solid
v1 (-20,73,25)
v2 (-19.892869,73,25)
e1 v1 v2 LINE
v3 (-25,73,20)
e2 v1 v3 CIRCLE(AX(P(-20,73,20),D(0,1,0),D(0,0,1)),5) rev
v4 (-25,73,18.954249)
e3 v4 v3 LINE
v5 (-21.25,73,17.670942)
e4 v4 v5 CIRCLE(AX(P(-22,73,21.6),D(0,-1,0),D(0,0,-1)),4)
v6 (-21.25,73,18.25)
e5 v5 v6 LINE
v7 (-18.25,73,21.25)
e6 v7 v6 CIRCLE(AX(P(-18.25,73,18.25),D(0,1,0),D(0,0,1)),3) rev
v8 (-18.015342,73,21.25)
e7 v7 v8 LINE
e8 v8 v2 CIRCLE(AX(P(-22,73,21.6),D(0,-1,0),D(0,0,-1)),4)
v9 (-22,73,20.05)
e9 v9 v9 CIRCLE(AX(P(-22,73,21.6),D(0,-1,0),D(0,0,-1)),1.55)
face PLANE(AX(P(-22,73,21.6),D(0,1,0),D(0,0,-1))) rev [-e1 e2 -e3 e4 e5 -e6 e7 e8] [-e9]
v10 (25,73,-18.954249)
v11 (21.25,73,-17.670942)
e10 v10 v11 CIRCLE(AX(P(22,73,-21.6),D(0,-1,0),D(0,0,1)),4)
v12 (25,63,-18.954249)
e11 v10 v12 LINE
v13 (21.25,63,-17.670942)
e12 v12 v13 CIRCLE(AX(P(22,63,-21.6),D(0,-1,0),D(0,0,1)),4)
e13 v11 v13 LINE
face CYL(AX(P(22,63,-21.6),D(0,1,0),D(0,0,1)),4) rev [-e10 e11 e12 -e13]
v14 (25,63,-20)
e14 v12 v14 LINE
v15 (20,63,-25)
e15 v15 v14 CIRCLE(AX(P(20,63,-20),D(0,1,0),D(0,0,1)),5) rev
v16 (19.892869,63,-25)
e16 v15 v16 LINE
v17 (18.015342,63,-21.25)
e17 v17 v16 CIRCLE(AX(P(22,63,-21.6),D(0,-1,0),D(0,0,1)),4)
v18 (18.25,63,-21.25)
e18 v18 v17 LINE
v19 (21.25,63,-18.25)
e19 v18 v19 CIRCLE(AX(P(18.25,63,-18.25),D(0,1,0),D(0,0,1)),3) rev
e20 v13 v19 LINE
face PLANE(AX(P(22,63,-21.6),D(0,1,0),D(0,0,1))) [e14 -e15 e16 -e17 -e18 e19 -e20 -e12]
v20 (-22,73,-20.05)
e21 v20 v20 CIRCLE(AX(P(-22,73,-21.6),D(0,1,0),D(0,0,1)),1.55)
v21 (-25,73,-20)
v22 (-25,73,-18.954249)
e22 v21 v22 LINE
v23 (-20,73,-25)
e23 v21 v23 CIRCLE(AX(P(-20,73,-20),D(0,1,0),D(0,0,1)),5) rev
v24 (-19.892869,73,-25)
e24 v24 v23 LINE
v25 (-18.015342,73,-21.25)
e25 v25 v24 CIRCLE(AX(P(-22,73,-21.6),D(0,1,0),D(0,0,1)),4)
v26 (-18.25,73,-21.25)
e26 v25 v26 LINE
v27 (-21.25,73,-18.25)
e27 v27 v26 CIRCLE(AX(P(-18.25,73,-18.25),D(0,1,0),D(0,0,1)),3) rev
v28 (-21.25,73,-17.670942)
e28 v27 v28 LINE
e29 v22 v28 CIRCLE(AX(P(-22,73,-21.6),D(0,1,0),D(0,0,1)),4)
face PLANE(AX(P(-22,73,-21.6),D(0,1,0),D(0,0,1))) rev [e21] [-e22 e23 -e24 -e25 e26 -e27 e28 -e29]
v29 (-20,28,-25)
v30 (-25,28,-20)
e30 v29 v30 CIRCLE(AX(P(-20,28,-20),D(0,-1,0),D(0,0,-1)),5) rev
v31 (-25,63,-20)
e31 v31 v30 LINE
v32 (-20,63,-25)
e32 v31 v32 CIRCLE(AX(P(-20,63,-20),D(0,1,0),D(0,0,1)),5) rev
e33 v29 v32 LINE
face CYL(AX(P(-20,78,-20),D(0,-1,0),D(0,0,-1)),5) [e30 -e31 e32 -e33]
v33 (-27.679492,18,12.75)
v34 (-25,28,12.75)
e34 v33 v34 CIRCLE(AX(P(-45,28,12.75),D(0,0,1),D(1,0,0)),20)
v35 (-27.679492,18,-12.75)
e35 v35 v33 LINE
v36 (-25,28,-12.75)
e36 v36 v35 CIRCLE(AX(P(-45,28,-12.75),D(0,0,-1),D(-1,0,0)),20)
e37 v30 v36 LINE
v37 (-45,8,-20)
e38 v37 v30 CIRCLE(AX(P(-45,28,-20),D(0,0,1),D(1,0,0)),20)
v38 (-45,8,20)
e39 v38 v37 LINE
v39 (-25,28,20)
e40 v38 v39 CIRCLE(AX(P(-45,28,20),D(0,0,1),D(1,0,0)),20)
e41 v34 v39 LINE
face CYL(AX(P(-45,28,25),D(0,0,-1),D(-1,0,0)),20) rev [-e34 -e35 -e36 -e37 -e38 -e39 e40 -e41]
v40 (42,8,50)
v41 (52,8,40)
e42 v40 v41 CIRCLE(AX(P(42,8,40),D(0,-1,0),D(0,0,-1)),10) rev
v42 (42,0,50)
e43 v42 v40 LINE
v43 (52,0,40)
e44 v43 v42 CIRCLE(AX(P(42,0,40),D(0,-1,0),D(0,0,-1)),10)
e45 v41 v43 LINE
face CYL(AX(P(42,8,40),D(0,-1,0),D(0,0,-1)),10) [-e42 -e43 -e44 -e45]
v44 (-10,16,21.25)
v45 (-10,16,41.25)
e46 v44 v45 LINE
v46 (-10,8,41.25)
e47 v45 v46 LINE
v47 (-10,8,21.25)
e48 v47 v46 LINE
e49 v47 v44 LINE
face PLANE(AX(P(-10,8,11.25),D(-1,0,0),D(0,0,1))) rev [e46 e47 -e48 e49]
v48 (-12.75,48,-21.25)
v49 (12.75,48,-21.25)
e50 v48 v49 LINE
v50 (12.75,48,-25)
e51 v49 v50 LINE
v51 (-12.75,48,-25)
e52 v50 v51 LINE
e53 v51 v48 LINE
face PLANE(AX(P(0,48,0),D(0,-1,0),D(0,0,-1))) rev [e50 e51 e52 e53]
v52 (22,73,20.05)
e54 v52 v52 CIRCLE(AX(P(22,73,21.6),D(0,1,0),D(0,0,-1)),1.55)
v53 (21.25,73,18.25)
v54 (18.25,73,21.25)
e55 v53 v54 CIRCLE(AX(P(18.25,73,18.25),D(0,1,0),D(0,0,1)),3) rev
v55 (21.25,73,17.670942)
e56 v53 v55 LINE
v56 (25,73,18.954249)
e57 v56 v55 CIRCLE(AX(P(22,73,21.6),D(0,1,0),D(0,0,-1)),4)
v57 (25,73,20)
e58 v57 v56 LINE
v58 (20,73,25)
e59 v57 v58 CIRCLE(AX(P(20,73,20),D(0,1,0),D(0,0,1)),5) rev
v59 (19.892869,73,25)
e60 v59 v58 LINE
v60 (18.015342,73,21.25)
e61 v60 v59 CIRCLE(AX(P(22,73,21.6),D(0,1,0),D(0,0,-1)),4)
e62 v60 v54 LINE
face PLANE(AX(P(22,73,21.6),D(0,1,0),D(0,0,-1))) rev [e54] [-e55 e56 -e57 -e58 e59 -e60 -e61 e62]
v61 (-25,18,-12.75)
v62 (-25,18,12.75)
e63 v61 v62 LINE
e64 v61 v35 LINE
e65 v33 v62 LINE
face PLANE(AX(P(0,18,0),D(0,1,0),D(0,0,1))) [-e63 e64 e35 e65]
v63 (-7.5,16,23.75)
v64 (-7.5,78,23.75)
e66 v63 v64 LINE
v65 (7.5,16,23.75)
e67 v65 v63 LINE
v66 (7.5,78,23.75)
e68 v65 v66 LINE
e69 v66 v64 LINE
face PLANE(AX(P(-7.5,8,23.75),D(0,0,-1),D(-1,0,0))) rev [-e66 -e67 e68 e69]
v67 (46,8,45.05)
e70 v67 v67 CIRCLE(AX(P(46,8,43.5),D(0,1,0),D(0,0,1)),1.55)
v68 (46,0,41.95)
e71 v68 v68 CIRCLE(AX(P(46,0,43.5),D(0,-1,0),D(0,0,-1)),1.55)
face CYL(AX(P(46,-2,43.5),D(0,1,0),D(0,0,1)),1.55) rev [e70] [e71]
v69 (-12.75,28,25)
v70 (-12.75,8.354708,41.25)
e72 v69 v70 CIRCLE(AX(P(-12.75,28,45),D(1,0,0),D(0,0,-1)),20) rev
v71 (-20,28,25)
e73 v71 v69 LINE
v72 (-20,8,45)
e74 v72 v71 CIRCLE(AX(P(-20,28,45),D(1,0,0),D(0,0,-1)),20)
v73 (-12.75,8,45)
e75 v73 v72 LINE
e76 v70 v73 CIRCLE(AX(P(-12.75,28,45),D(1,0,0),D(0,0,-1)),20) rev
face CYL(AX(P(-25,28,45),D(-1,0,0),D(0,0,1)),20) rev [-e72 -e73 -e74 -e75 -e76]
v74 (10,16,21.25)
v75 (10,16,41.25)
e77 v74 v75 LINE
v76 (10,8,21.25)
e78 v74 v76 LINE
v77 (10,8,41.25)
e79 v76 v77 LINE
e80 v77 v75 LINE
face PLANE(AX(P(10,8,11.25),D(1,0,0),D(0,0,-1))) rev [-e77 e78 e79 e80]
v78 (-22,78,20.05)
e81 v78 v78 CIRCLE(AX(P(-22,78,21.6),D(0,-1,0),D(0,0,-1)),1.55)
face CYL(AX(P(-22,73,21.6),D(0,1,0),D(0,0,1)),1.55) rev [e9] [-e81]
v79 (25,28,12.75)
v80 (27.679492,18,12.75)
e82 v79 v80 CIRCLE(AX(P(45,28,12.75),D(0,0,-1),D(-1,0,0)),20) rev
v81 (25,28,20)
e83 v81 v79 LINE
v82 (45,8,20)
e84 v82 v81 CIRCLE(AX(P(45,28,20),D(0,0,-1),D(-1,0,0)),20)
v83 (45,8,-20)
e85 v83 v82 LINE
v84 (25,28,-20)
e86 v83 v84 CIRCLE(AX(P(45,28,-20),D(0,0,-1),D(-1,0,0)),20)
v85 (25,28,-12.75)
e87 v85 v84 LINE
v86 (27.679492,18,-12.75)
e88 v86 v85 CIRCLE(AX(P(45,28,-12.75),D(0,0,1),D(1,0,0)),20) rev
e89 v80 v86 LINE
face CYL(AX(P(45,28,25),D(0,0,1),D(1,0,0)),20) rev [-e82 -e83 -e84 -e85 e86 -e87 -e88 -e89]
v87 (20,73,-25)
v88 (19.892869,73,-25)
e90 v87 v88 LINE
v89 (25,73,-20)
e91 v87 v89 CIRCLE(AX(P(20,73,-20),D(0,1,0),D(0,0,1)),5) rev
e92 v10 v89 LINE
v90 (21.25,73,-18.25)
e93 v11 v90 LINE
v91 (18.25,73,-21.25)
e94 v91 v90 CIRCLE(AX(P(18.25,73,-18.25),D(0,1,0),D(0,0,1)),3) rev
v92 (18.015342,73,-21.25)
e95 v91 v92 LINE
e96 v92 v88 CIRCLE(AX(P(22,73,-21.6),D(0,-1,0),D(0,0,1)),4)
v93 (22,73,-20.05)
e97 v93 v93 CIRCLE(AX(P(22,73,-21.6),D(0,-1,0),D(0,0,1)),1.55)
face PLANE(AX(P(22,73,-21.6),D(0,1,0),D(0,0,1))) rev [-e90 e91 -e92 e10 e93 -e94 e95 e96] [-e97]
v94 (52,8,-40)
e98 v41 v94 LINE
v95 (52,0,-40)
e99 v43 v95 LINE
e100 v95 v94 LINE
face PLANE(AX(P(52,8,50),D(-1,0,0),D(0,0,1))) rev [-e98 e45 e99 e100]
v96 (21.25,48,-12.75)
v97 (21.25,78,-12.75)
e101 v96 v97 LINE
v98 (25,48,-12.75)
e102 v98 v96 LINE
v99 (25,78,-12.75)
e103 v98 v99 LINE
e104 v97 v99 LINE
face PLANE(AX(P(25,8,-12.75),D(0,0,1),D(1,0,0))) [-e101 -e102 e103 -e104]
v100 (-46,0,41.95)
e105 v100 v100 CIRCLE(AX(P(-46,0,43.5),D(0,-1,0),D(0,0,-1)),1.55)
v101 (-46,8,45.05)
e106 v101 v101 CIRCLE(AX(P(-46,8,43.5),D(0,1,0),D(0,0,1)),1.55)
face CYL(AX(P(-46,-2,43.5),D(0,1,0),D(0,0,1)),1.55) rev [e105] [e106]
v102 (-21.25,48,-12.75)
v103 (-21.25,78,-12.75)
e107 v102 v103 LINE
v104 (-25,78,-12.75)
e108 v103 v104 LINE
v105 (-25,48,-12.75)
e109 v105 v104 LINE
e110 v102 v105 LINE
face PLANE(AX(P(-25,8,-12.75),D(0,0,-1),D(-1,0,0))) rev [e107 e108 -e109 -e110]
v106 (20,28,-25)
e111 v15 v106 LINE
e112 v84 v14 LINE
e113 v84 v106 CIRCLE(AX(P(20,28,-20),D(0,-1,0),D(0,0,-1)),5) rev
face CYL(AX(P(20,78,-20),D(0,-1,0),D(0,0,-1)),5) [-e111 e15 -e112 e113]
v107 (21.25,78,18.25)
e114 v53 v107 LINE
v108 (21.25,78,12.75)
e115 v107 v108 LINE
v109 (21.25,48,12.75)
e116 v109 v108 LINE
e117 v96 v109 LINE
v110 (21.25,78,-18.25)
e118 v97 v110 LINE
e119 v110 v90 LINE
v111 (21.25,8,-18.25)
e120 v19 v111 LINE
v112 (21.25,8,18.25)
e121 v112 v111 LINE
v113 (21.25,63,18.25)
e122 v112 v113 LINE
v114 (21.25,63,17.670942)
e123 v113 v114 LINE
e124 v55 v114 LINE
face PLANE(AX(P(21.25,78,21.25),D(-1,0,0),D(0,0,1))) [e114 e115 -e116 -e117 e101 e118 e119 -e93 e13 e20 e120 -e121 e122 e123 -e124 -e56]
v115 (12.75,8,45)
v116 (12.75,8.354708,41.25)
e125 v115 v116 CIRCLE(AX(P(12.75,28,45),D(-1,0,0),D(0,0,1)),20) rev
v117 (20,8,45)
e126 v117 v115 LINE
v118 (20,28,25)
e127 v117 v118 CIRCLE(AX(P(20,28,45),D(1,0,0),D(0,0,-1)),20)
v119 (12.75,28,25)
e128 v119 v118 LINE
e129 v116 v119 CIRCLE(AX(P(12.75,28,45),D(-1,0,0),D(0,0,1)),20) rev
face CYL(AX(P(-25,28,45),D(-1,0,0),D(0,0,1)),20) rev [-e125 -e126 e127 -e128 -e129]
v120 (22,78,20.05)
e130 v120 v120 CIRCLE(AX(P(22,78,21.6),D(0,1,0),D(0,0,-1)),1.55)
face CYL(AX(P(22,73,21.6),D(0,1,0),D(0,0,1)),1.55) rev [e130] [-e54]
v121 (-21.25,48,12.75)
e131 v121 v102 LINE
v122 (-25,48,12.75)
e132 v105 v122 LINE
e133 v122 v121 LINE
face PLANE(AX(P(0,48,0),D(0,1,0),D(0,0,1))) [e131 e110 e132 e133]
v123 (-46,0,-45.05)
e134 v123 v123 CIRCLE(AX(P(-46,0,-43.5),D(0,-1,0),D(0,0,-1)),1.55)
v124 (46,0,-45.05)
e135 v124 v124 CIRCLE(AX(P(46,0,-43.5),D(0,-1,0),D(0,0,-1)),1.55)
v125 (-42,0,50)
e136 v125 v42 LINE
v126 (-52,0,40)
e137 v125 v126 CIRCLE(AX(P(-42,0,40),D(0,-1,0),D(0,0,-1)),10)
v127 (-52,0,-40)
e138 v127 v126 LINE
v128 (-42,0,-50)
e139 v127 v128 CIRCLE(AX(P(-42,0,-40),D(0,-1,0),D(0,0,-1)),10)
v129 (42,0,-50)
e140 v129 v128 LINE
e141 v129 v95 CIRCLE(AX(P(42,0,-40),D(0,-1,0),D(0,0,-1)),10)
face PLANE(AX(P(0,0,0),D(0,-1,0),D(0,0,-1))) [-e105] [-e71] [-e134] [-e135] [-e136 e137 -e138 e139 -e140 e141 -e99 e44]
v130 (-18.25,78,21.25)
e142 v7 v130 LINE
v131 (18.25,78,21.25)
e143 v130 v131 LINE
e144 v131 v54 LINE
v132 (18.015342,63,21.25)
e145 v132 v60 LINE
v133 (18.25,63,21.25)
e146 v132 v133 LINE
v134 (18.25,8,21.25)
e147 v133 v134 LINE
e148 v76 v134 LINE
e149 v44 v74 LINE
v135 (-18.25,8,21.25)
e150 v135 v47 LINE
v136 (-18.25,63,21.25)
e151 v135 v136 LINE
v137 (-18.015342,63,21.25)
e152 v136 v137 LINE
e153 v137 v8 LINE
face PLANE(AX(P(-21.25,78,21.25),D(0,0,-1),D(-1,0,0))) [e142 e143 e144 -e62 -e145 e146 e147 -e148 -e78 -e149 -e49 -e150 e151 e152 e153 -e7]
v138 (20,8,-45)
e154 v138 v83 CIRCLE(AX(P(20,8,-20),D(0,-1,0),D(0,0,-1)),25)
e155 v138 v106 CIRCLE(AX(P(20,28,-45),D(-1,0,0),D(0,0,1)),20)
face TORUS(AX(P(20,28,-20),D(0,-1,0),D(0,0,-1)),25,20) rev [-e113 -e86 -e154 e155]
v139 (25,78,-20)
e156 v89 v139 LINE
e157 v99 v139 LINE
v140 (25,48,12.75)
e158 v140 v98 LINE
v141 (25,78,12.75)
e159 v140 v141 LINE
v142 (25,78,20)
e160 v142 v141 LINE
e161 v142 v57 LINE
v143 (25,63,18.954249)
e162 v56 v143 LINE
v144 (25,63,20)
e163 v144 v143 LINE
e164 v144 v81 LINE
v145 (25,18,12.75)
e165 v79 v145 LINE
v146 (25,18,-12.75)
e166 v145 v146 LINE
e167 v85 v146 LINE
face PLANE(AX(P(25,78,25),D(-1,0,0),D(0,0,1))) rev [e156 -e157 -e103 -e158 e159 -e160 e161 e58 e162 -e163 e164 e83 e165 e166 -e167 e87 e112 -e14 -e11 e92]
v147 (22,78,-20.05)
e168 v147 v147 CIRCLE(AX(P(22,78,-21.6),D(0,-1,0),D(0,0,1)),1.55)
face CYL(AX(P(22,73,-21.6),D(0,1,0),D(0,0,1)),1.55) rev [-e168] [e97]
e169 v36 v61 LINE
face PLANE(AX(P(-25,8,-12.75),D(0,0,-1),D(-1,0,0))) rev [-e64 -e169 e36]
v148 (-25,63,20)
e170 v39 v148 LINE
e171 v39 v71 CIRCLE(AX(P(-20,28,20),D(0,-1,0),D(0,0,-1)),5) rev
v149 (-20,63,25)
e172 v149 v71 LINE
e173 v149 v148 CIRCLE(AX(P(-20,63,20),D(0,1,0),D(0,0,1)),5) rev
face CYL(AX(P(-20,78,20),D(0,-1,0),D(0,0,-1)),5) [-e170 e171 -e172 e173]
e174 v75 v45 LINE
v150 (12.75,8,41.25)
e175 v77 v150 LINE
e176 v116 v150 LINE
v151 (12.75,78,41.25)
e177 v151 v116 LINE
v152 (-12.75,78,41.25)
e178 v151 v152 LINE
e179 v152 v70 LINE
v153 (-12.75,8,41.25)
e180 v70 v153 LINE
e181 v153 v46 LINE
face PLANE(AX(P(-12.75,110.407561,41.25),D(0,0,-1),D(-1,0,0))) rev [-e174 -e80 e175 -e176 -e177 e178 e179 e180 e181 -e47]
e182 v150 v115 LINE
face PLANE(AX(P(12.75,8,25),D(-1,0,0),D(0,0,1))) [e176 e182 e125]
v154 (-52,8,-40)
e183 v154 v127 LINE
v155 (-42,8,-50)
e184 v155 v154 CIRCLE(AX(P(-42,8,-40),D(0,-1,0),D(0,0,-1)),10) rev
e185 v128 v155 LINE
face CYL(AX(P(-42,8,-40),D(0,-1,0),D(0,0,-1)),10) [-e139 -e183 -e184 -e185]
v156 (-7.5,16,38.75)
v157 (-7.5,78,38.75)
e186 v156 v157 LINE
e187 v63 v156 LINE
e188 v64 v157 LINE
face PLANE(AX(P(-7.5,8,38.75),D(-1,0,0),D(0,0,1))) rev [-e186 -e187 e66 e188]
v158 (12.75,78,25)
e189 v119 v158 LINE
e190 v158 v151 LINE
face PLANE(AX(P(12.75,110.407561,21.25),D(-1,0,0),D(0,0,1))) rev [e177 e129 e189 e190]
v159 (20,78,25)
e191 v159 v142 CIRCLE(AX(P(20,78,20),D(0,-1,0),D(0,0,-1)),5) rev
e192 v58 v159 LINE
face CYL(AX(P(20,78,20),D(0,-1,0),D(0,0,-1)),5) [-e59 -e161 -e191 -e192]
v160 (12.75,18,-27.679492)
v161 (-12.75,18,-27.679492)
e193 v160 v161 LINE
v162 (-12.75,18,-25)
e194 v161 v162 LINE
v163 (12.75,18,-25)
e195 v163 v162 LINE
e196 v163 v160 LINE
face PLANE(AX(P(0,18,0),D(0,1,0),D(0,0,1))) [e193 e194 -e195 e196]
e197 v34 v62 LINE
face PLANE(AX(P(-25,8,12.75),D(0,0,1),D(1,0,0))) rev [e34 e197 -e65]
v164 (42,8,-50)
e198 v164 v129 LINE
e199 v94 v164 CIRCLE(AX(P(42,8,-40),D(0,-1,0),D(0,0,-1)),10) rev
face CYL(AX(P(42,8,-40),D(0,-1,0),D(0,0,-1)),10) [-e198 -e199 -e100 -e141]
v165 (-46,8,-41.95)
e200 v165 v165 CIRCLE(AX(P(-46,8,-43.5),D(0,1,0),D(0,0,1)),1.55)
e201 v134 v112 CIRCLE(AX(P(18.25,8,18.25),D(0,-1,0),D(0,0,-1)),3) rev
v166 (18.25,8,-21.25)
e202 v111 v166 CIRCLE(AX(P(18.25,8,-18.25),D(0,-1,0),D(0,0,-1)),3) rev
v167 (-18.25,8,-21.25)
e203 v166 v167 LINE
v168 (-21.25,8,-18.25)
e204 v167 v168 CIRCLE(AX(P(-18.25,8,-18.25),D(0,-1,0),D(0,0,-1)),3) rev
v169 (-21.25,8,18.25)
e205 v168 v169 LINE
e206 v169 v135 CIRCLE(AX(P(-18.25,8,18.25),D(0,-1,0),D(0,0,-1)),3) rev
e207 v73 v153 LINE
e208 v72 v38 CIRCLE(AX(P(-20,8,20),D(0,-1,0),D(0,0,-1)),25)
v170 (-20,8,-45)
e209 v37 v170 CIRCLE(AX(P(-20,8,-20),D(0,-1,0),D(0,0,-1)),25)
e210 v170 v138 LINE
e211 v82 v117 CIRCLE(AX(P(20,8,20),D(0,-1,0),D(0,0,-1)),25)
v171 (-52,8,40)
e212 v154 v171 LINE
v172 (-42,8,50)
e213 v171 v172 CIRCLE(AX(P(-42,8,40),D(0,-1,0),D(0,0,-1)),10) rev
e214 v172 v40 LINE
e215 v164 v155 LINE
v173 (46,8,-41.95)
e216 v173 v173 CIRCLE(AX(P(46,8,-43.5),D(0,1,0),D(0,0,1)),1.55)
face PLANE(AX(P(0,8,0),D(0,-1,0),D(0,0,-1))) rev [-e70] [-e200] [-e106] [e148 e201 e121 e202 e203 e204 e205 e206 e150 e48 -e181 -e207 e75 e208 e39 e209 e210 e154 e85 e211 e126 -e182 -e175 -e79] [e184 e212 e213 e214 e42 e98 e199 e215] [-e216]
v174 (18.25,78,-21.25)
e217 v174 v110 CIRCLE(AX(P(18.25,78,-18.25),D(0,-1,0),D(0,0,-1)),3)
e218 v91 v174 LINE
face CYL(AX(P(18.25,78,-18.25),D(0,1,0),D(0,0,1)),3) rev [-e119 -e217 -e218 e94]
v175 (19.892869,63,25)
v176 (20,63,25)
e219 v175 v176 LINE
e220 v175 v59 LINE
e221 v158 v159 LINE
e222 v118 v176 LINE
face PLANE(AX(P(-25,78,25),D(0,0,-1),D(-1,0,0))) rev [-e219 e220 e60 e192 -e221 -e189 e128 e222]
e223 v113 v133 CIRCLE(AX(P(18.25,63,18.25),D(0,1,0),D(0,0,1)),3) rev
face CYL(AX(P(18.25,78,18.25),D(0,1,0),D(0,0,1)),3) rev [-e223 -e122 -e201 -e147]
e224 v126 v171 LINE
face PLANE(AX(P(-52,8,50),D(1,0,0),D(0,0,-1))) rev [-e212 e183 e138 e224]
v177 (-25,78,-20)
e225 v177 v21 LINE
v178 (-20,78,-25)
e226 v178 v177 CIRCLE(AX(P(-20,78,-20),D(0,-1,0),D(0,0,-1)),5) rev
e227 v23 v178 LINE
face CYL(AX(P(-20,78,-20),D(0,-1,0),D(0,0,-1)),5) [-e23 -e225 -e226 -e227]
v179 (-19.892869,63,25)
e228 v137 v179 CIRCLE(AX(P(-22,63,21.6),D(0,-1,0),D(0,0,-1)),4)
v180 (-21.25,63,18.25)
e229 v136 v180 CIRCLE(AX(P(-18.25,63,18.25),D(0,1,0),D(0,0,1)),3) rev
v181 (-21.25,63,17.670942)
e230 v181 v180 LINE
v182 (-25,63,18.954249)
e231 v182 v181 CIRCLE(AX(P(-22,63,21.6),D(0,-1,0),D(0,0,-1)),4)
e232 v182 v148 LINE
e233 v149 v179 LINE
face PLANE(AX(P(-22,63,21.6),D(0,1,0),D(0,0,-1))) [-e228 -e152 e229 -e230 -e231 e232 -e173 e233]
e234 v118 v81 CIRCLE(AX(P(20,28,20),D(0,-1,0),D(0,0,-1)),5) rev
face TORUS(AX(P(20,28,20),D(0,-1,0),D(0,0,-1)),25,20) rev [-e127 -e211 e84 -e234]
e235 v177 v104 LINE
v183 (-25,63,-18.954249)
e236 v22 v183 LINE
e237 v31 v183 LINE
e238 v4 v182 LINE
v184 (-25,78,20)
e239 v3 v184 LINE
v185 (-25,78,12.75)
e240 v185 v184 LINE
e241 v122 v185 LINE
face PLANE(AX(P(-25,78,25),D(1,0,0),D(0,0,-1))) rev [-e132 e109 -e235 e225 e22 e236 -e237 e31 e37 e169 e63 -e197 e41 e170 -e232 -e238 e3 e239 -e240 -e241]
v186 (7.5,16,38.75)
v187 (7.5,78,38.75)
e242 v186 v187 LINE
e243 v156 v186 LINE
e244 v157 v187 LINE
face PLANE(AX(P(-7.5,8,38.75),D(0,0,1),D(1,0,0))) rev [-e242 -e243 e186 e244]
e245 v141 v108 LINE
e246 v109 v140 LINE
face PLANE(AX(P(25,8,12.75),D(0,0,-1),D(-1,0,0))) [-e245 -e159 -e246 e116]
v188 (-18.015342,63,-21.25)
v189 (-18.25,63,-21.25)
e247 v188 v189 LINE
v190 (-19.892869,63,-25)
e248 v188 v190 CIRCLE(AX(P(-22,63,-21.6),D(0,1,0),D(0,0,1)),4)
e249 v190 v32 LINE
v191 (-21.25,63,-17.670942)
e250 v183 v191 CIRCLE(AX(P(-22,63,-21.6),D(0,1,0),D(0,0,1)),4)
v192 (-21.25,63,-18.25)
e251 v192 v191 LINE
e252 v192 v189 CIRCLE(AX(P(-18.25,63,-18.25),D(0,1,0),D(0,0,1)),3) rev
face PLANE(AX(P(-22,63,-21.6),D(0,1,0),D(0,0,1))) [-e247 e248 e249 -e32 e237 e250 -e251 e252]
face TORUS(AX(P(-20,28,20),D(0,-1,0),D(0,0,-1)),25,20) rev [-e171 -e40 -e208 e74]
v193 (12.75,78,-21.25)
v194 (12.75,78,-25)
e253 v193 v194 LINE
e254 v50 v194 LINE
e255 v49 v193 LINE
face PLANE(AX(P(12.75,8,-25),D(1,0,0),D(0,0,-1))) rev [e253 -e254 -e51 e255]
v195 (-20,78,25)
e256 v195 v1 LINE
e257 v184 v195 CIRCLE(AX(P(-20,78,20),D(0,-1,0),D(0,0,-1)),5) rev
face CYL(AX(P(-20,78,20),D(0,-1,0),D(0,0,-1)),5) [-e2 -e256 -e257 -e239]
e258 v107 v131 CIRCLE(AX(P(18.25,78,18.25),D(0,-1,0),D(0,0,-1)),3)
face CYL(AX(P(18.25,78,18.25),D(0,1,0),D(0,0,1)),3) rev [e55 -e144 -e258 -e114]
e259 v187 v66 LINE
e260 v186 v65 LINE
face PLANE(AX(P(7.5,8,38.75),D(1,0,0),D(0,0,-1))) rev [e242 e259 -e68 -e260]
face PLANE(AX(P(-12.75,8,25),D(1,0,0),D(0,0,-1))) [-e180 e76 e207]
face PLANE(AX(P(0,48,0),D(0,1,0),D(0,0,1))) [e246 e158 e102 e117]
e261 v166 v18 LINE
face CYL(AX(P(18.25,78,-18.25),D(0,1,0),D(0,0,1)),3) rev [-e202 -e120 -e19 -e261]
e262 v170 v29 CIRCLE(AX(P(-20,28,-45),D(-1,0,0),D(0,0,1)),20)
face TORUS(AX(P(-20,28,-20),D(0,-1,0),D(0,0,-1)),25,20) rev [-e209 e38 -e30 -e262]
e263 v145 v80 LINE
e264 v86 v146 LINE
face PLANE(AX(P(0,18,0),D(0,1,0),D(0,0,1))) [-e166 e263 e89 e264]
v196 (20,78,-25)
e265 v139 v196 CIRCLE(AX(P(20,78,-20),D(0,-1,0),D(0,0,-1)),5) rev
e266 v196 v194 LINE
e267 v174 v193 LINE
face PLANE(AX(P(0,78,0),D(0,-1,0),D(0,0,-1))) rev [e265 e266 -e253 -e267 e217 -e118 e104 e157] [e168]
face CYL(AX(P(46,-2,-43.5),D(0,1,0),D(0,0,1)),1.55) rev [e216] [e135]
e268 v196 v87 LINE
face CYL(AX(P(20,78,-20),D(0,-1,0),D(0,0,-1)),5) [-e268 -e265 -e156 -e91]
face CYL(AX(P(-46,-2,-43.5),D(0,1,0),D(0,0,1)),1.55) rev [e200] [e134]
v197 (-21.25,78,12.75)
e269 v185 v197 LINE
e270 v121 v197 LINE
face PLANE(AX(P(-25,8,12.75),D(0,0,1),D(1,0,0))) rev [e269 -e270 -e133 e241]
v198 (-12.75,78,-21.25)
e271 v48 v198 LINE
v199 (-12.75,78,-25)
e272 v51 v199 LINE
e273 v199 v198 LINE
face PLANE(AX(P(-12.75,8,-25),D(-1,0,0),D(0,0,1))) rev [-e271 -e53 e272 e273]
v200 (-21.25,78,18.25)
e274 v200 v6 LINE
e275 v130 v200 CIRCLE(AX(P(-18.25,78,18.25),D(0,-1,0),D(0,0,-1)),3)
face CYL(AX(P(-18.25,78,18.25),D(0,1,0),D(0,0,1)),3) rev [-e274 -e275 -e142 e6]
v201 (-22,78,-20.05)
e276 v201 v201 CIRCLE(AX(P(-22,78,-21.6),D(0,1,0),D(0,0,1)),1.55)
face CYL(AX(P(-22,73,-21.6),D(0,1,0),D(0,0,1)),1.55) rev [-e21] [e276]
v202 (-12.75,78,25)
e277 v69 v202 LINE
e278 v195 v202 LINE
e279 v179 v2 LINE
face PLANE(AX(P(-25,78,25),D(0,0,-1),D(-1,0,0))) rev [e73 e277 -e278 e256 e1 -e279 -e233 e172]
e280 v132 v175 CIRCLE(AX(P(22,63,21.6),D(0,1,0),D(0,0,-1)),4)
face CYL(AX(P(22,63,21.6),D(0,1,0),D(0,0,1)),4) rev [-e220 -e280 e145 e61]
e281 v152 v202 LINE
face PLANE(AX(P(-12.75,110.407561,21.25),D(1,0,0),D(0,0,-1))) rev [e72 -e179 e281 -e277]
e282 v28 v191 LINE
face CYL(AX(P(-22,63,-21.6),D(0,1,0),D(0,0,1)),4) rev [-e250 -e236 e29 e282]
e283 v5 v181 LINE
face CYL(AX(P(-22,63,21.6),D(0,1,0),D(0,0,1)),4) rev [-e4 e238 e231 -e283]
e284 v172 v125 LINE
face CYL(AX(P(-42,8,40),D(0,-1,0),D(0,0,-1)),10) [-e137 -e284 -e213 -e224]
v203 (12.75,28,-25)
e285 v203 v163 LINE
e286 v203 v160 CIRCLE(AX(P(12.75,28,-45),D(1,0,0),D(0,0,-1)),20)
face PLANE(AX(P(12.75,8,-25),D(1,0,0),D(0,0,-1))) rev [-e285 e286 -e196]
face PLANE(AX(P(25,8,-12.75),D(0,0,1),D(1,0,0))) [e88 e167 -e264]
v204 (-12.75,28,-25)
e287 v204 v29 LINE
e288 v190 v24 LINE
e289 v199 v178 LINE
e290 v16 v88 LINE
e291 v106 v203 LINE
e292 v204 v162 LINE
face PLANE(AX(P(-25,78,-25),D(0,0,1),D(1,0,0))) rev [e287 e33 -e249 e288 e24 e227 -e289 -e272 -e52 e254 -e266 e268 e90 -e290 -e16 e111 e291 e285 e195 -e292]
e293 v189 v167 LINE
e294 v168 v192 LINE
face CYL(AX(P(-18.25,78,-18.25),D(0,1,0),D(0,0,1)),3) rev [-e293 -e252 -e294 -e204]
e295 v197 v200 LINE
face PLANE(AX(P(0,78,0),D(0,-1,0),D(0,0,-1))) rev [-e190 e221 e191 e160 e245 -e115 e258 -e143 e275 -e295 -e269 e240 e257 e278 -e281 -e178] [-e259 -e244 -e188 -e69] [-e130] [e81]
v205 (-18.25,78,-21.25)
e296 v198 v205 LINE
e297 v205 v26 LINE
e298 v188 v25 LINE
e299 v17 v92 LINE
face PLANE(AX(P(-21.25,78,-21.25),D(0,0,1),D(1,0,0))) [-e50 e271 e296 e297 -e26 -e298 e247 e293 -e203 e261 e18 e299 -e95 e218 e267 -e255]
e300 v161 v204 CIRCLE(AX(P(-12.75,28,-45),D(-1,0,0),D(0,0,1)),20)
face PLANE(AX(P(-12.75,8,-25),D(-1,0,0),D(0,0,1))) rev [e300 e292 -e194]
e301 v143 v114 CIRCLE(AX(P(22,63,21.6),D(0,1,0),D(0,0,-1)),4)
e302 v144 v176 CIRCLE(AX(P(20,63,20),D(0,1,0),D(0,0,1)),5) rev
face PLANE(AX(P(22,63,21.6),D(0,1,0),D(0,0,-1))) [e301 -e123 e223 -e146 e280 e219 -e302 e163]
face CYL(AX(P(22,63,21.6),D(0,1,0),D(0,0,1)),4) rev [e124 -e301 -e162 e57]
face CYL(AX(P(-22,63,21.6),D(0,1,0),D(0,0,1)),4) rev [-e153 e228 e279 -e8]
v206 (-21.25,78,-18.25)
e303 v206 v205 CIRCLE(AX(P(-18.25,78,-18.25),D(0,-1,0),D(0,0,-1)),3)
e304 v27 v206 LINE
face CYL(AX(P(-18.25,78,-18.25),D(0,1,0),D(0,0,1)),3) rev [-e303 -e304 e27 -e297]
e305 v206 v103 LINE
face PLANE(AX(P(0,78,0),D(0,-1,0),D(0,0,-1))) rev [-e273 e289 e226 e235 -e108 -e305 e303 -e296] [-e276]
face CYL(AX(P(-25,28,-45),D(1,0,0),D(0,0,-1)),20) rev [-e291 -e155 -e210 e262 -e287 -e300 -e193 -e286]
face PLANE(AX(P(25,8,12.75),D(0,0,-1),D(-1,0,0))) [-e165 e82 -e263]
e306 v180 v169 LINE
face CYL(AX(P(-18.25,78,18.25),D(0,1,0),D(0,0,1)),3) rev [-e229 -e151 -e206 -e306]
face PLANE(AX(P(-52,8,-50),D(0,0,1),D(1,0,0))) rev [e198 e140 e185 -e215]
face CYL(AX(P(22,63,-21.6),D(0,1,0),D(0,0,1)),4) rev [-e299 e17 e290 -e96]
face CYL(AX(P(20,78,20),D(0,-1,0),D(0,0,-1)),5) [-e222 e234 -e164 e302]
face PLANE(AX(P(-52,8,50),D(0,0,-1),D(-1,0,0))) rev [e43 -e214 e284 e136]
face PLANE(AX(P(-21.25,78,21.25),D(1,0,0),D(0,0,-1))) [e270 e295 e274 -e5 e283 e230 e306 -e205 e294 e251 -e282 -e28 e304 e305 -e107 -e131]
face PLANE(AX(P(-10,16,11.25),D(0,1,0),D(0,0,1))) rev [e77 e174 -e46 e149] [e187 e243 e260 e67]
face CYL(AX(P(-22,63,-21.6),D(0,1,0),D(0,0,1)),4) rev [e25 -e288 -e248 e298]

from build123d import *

# Parameters (mm, degrees)
SKETCH1_W               = 104
SKETCH1_H               = 100
BOSS_EXTRUDE1_DEPTH     = 8
FILLET1_R               = 10
SKETCH2_R               = 1.55
CUT_EXTRUDE1_DEPTH      = 10
SKETCH3_W               = 50
SKETCH3_H               = 50
SKETCH3_W_2             = 42.5
SKETCH3_H_2             = 42.5
BOSS_EXTRUDE2_DEPTH     = 70
FILLET2_R               = 5
FILLET3_R               = 3
SKETCH4_W               = 25.5
SKETCH4_H               = 3.75
SKETCH4_W_2             = 3.75
SKETCH4_H_2             = 25.5
CUT_EXTRUDE2_DEPTH      = 70
SKETCH5_R               = 1.55
CUT_EXTRUDE3_DEPTH      = 5
SKETCH6_R               = 4
CUT_EXTRUDE4_DEPTH      = 10
MIRROR4_COPY_1_SKETCH_R = 1.55
MIRROR4_COPY_1_DEPTH    = 5
MIRROR4_COPY_2_SKETCH_R = 4
MIRROR4_COPY_2_DEPTH    = 10
SKETCH7_W               = 25.5
SKETCH7_H               = 3.75
SKETCH7_W_2             = 3.75
SKETCH7_H_2             = 25.5
BOSS_EXTRUDE3_DEPTH     = 10
FILLET4_R               = 20
SKETCH8_W               = 3.75
SKETCH8_H               = 25.5
SKETCH8_W_2             = 25.5
SKETCH8_H_2             = 3.75
BOSS_EXTRUDE4_DEPTH     = 30
SKETCH9_W               = 25.5
SKETCH9_H               = 20
BOSS_EXTRUDE5_DEPTH     = 70
SKETCH10_W              = 20
SKETCH10_H              = 8
CUT_EXTRUDE5_DEPTH      = 30
SKETCH11_W              = 15
SKETCH11_H              = 15
CUT_EXTRUDE6_DEPTH      = 70


with BuildPart() as part:
    # Sketch1 → Boss-Extrude1 (new body)
    with BuildSketch(Plane(origin=(0, 0, 0), x_dir=(1, 0, 0), z_dir=(0, 1, 0))):
        Rectangle(SKETCH1_W, SKETCH1_H)
    extrude(amount=BOSS_EXTRUDE1_DEPTH)

    # Fillet1
    fillet1_edges = [part.edges().sort_by_distance(p)[0] for p in [
        (52, 4, 50),
        (-52, 4, 50),
        (-52, 4, -50),
        (52, 4, -50),
    ]]
    fillet(fillet1_edges, radius=FILLET1_R)

    # Sketch2 → Cut-Extrude1 (cut)
    with BuildSketch(Plane(origin=(0, 8, 0), x_dir=(1, 0, 0), z_dir=(0, 1, 0))):
        with Locations(Location((-46, 43.5, 0), (0, 0, 270))):
            Circle(SKETCH2_R)
        with Locations(Location((46, 43.5, 0), (0, 0, 270))):
            Circle(SKETCH2_R)
        with Locations(Location((46, -43.5, 0), (0, 0, 270))):
            Circle(SKETCH2_R)
        with Locations(Location((-46, -43.5, 0), (0, 0, 270))):
            Circle(SKETCH2_R)
    extrude(amount=-CUT_EXTRUDE1_DEPTH, mode=Mode.SUBTRACT)

    # Sketch3 → Boss-Extrude2 (add)
    with BuildSketch(Plane(origin=(0, 8, 0), x_dir=(1, 0, 0), z_dir=(0, 1, 0))):
        Rectangle(SKETCH3_W, SKETCH3_H)
        Rectangle(SKETCH3_W_2, SKETCH3_H_2, mode=Mode.SUBTRACT)
    extrude(amount=BOSS_EXTRUDE2_DEPTH)

    # Fillet2
    fillet2_edges = [part.edges().sort_by_distance(p)[0] for p in [
        (25, 43, 25),
        (25, 43, -25),
        (-25, 43, -25),
        (-25, 43, 25),
    ]]
    fillet(fillet2_edges, radius=FILLET2_R)

    # Fillet3
    fillet3_edges = [part.edges().sort_by_distance(p)[0] for p in [
        (21.25, 43, -21.25),
        (-21.25, 43, -21.25),
        (-21.25, 43, 21.25),
        (21.25, 43, 21.25),
    ]]
    fillet(fillet3_edges, radius=FILLET3_R)

    # Sketch4 → Cut-Extrude2 (cut)
    with BuildSketch(Plane(origin=(0, 78, 0), x_dir=(1, 0, 0), z_dir=(0, 1, 0))):
        with Locations((0, 23.125)):
            Rectangle(SKETCH4_W, SKETCH4_H)
        with Locations((-23.125, 0)):
            Rectangle(SKETCH4_W_2, SKETCH4_H_2)
    cut_extrude2 = extrude(amount=-CUT_EXTRUDE2_DEPTH, mode=Mode.SUBTRACT)

    # Mirror1: Cut-Extrude2 across plane
    add(cut_extrude2.mirror(Plane.XY), mode=Mode.SUBTRACT)

    # Mirror2: Cut-Extrude2 across plane
    add(cut_extrude2.mirror(Plane(origin=(0, 0, 0), x_dir=(0, 0, 1), z_dir=(1, 0, 0))), mode=Mode.SUBTRACT)

    # Sketch5 → Cut-Extrude3 (cut)
    with BuildSketch(Plane(origin=(0, 78, 0), x_dir=(1, 0, 0), z_dir=(0, 1, 0))):
        with Locations(Location((-22, 21.6, 0), (0, 0, 270))):
            Circle(SKETCH5_R)
    cut_extrude3 = extrude(amount=-CUT_EXTRUDE3_DEPTH, mode=Mode.SUBTRACT)

    # Sketch6 → Cut-Extrude4 (cut)
    with BuildSketch(Plane(origin=(0, 73, 0), x_dir=(1, 0, 0), z_dir=(0, 1, 0))):
        with Locations((-22, 21.6)):
            Circle(SKETCH6_R)
    cut_extrude4 = extrude(amount=-CUT_EXTRUDE4_DEPTH, mode=Mode.SUBTRACT)

    # Mirror3: Cut-Extrude3, Cut-Extrude4 across plane
    add(cut_extrude3.mirror(Plane(origin=(0, 0, 0), x_dir=(0, 0, 1), z_dir=(1, 0, 0))), mode=Mode.SUBTRACT)
    add(cut_extrude4.mirror(Plane(origin=(0, 0, 0), x_dir=(0, 0, 1), z_dir=(1, 0, 0))), mode=Mode.SUBTRACT)

    # Mirror4: Cut-Extrude3, Cut-Extrude4 across plane
    add(cut_extrude3.mirror(Plane.XY), mode=Mode.SUBTRACT)
    add(cut_extrude4.mirror(Plane.XY), mode=Mode.SUBTRACT)

    # Mirror4 copy 1 sketch → Mirror4 copy 1 (cut)
    with BuildSketch(Plane(origin=(0, 78, 0), x_dir=(-1, 0, 0), z_dir=(0, 1, 0))):
        with Locations(Location((-22, 21.6, 0), (0, 0, 270))):
            Circle(MIRROR4_COPY_1_SKETCH_R)
    extrude(amount=-MIRROR4_COPY_1_DEPTH, mode=Mode.SUBTRACT)

    # Mirror4 copy 2 sketch → Mirror4 copy 2 (cut)
    with BuildSketch(Plane(origin=(0, 73, 0), x_dir=(-1, 0, 0), z_dir=(0, 1, 0))):
        with Locations((-22, 21.6)):
            Circle(MIRROR4_COPY_2_SKETCH_R)
    extrude(amount=-MIRROR4_COPY_2_DEPTH, mode=Mode.SUBTRACT)

    # Sketch7 → Boss-Extrude3 (add)
    with BuildSketch(Plane(origin=(0, 8, 0), x_dir=(1, 0, 0), z_dir=(0, 1, 0))):
        with Locations((0, 23.125)):
            Rectangle(SKETCH7_W, SKETCH7_H)
        with Locations((-23.125, 0)):
            Rectangle(SKETCH7_W_2, SKETCH7_H_2)
        with Locations((23.125, 0)):
            Rectangle(SKETCH7_W_2, SKETCH7_H_2)
    extrude(amount=BOSS_EXTRUDE3_DEPTH)

    # Fillet4
    # the kernel refuses this fillet: 20 mm, written as the material it adds along each edge
    with BuildSketch(Plane(origin=(12.75, 8, 25), x_dir=(0, 0, 1), z_dir=(1, 0, 0)), Plane(origin=(-20, 8, 25), x_dir=(0, 0, 1), z_dir=(1, 0, 0))) as fillet4_piece_1:
        with BuildLine():
            CenterArc((FILLET4_R, -FILLET4_R), FILLET4_R, 90, 90)
            Line((0, -FILLET4_R), (0, 0))
            Line((0, 0), (FILLET4_R, 0))
        make_face()
    extrude(amount=7.25)
    with BuildSketch(Plane(origin=(20, 8, 20), x_dir=(0, 0, 1), z_dir=(-1, 0, 0))) as fillet4_piece_2:
        with BuildLine():
            CenterArc((5 + FILLET4_R, FILLET4_R), FILLET4_R, 180, 90)
            Line((5, FILLET4_R), (5, 0))
            Line((5, 0), (5 + FILLET4_R, 0))
        make_face()
    revolve(axis=Axis((20, 8, 20), (0, 1, 0)), revolution_arc=90)
    with BuildSketch(Plane(origin=(25, 8, -20), x_dir=(1, 0, 0), z_dir=(0, 0, 1))) as fillet4_piece_3_section:
        with BuildLine():
            CenterArc((FILLET4_R, FILLET4_R), FILLET4_R, 180, 90)
            Line((0, FILLET4_R), (0, 0))
            Line((0, 0), (FILLET4_R, 0))
        make_face()
    fillet4_piece_3 = extrude(amount=40, mode=Mode.PRIVATE)
    fillet4_piece_3 = split(fillet4_piece_3, bisect_by=Plane(origin=(30.102401199, 11.287835286, -12.75), z_dir=(0, 0, -1)), keep=Keep.TOP, mode=Mode.PRIVATE)
    fillet4_piece_3 = split(fillet4_piece_3, bisect_by=Plane(origin=(30.102401199, 18, -16.375), z_dir=(0, -1, 0)), keep=Keep.TOP, mode=Mode.PRIVATE)
    add(fillet4_piece_3)
    with BuildSketch(Plane(origin=(25, 8, -20), x_dir=(1, 0, 0), z_dir=(0, 0, 1))) as fillet4_piece_4_section:
        with BuildLine():
            CenterArc((FILLET4_R, FILLET4_R), FILLET4_R, 180, 90)
            Line((0, FILLET4_R), (0, 0))
            Line((0, 0), (FILLET4_R, 0))
        make_face()
    fillet4_piece_4 = extrude(amount=40, mode=Mode.PRIVATE)
    fillet4_piece_4 = split(fillet4_piece_4, bisect_by=Plane(origin=(25.480167634, 21.26501569, -12.75), z_dir=(0, 0, -1)), keep=Keep.TOP, mode=Mode.PRIVATE)
    fillet4_piece_4 = split(fillet4_piece_4, bisect_by=Plane(origin=(25.480167634, 18, -16.375), z_dir=(0, 1, 0)), keep=Keep.TOP, mode=Mode.PRIVATE)
    add(fillet4_piece_4)
    with BuildSketch(Plane(origin=(25, 8, -20), x_dir=(1, 0, 0), z_dir=(0, 0, 1))) as fillet4_piece_5_section:
        with BuildLine():
            CenterArc((FILLET4_R, FILLET4_R), FILLET4_R, 180, 90)
            Line((0, FILLET4_R), (0, 0))
            Line((0, 0), (FILLET4_R, 0))
        make_face()
    fillet4_piece_5 = extrude(amount=40, mode=Mode.PRIVATE)
    fillet4_piece_5 = split(fillet4_piece_5, bisect_by=Plane(origin=(30.102401199, 11.287835286, -12.75), z_dir=(0, 0, 1)), keep=Keep.TOP, mode=Mode.PRIVATE)
    fillet4_piece_5 = split(fillet4_piece_5, bisect_by=Plane(origin=(30.102401199, 18, 0), z_dir=(0, -1, 0)), keep=Keep.TOP, mode=Mode.PRIVATE)
    fillet4_piece_5 = split(fillet4_piece_5, bisect_by=Plane(origin=(30.102401199, 11.287835286, 12.75), z_dir=(0, 0, -1)), keep=Keep.TOP, mode=Mode.PRIVATE)
    add(fillet4_piece_5)
    with BuildSketch(Plane(origin=(25, 8, -20), x_dir=(1, 0, 0), z_dir=(0, 0, 1))) as fillet4_piece_6_section:
        with BuildLine():
            CenterArc((FILLET4_R, FILLET4_R), FILLET4_R, 180, 90)
            Line((0, FILLET4_R), (0, 0))
            Line((0, 0), (FILLET4_R, 0))
        make_face()
    fillet4_piece_6 = extrude(amount=40, mode=Mode.PRIVATE)
    fillet4_piece_6 = split(fillet4_piece_6, bisect_by=Plane(origin=(30.102401199, 18, 16.375), z_dir=(0, -1, 0)), keep=Keep.TOP, mode=Mode.PRIVATE)
    fillet4_piece_6 = split(fillet4_piece_6, bisect_by=Plane(origin=(30.102401199, 11.287835286, 12.75), z_dir=(0, 0, 1)), keep=Keep.TOP, mode=Mode.PRIVATE)
    add(fillet4_piece_6)
    with BuildSketch(Plane(origin=(25, 8, -20), x_dir=(1, 0, 0), z_dir=(0, 0, 1))) as fillet4_piece_7_section:
        with BuildLine():
            CenterArc((FILLET4_R, FILLET4_R), FILLET4_R, 180, 90)
            Line((0, FILLET4_R), (0, 0))
            Line((0, 0), (FILLET4_R, 0))
        make_face()
    fillet4_piece_7 = extrude(amount=40, mode=Mode.PRIVATE)
    fillet4_piece_7 = split(fillet4_piece_7, bisect_by=Plane(origin=(25.480167634, 18, 16.375), z_dir=(0, 1, 0)), keep=Keep.TOP, mode=Mode.PRIVATE)
    fillet4_piece_7 = split(fillet4_piece_7, bisect_by=Plane(origin=(25.480167634, 21.26501569, 12.75), z_dir=(0, 0, 1)), keep=Keep.TOP, mode=Mode.PRIVATE)
    add(fillet4_piece_7)
    with BuildSketch(Plane(origin=(20, 8, -20), x_dir=(1, 0, 0), z_dir=(0, 0, 1))) as fillet4_piece_8:
        with BuildLine():
            CenterArc((5 + FILLET4_R, FILLET4_R), FILLET4_R, 180, 90)
            Line((5, FILLET4_R), (5, 0))
            Line((5, 0), (5 + FILLET4_R, 0))
        make_face()
    revolve(axis=Axis((20, 8, -20), (0, 1, 0)), revolution_arc=90)
    with BuildSketch(Plane(origin=(20, 8, -25), x_dir=(0, 0, -1), z_dir=(-1, 0, 0))) as fillet4_piece_9_section:
        with BuildLine():
            CenterArc((FILLET4_R, -FILLET4_R), FILLET4_R, 90, 90)
            Line((0, -FILLET4_R), (0, 0))
            Line((0, 0), (FILLET4_R, 0))
        make_face()
    fillet4_piece_9 = extrude(amount=40, mode=Mode.PRIVATE)
    fillet4_piece_9 = split(fillet4_piece_9, bisect_by=Plane(origin=(12.75, 11.287835286, -30.102401199), z_dir=(1, 0, 0)), keep=Keep.TOP, mode=Mode.PRIVATE)
    fillet4_piece_9 = split(fillet4_piece_9, bisect_by=Plane(origin=(16.375, 18, -30.102401199), z_dir=(0, -1, 0)), keep=Keep.TOP, mode=Mode.PRIVATE)
    add(fillet4_piece_9)
    with BuildSketch(Plane(origin=(20, 8, -25), x_dir=(0, 0, -1), z_dir=(-1, 0, 0))) as fillet4_piece_10_section:
        with BuildLine():
            CenterArc((FILLET4_R, -FILLET4_R), FILLET4_R, 90, 90)
            Line((0, -FILLET4_R), (0, 0))
            Line((0, 0), (FILLET4_R, 0))
        make_face()
    fillet4_piece_10 = extrude(amount=40, mode=Mode.PRIVATE)
    fillet4_piece_10 = split(fillet4_piece_10, bisect_by=Plane(origin=(12.75, 21.26501569, -25.480167634), z_dir=(1, 0, 0)), keep=Keep.TOP, mode=Mode.PRIVATE)
    fillet4_piece_10 = split(fillet4_piece_10, bisect_by=Plane(origin=(16.375, 18, -25.480167634), z_dir=(0, 1, 0)), keep=Keep.TOP, mode=Mode.PRIVATE)
    add(fillet4_piece_10)
    with BuildSketch(Plane(origin=(20, 8, -25), x_dir=(0, 0, -1), z_dir=(-1, 0, 0))) as fillet4_piece_11_section:
        with BuildLine():
            CenterArc((FILLET4_R, -FILLET4_R), FILLET4_R, 90, 90)
            Line((0, -FILLET4_R), (0, 0))
            Line((0, 0), (FILLET4_R, 0))
        make_face()
    fillet4_piece_11 = extrude(amount=40, mode=Mode.PRIVATE)
    fillet4_piece_11 = split(fillet4_piece_11, bisect_by=Plane(origin=(12.75, 11.287835286, -30.102401199), z_dir=(-1, 0, 0)), keep=Keep.TOP, mode=Mode.PRIVATE)
    fillet4_piece_11 = split(fillet4_piece_11, bisect_by=Plane(origin=(0, 18, -30.102401199), z_dir=(0, -1, 0)), keep=Keep.TOP, mode=Mode.PRIVATE)
    fillet4_piece_11 = split(fillet4_piece_11, bisect_by=Plane(origin=(-12.75, 11.287835286, -30.102401199), z_dir=(1, 0, 0)), keep=Keep.TOP, mode=Mode.PRIVATE)
    add(fillet4_piece_11)
    with BuildSketch(Plane(origin=(20, 8, -25), x_dir=(0, 0, -1), z_dir=(-1, 0, 0))) as fillet4_piece_12_section:
        with BuildLine():
            CenterArc((FILLET4_R, -FILLET4_R), FILLET4_R, 90, 90)
            Line((0, -FILLET4_R), (0, 0))
            Line((0, 0), (FILLET4_R, 0))
        make_face()
    fillet4_piece_12 = extrude(amount=40, mode=Mode.PRIVATE)
    fillet4_piece_12 = split(fillet4_piece_12, bisect_by=Plane(origin=(-16.375, 18, -30.102401199), z_dir=(0, -1, 0)), keep=Keep.TOP, mode=Mode.PRIVATE)
    fillet4_piece_12 = split(fillet4_piece_12, bisect_by=Plane(origin=(-12.75, 11.287835286, -30.102401199), z_dir=(-1, 0, 0)), keep=Keep.TOP, mode=Mode.PRIVATE)
    add(fillet4_piece_12)
    with BuildSketch(Plane(origin=(20, 8, -25), x_dir=(0, 0, -1), z_dir=(-1, 0, 0))) as fillet4_piece_13_section:
        with BuildLine():
            CenterArc((FILLET4_R, -FILLET4_R), FILLET4_R, 90, 90)
            Line((0, -FILLET4_R), (0, 0))
            Line((0, 0), (FILLET4_R, 0))
        make_face()
    fillet4_piece_13 = extrude(amount=40, mode=Mode.PRIVATE)
    fillet4_piece_13 = split(fillet4_piece_13, bisect_by=Plane(origin=(-16.375, 18, -25.480167634), z_dir=(0, 1, 0)), keep=Keep.TOP, mode=Mode.PRIVATE)
    fillet4_piece_13 = split(fillet4_piece_13, bisect_by=Plane(origin=(-12.75, 21.26501569, -25.480167634), z_dir=(-1, 0, 0)), keep=Keep.TOP, mode=Mode.PRIVATE)
    add(fillet4_piece_13)
    with BuildSketch(Plane(origin=(-20, 8, -20), x_dir=(0, 0, -1), z_dir=(1, 0, 0))) as fillet4_piece_14:
        with BuildLine():
            CenterArc((5 + FILLET4_R, FILLET4_R), FILLET4_R, 180, 90)
            Line((5, FILLET4_R), (5, 0))
            Line((5, 0), (5 + FILLET4_R, 0))
        make_face()
    revolve(axis=Axis((-20, 8, -20), (0, 1, 0)), revolution_arc=90)
    with BuildSketch(Plane(origin=(-20, 8, 20), x_dir=(0, 0, 1), z_dir=(1, 0, 0))) as fillet4_piece_15:
        with BuildLine():
            CenterArc((5 + FILLET4_R, -FILLET4_R), FILLET4_R, 90, 90)
            Line((5, -FILLET4_R), (5, 0))
            Line((5, 0), (5 + FILLET4_R, 0))
        make_face()
    revolve(axis=Axis((-20, 8, 20), (0, -1, 0)), revolution_arc=90)
    with BuildSketch(Plane(origin=(-25, 8, -20), x_dir=(-1, 0, 0), z_dir=(0, 0, 1))) as fillet4_piece_16_section:
        with BuildLine():
            CenterArc((FILLET4_R, -FILLET4_R), FILLET4_R, 90, 90)
            Line((0, -FILLET4_R), (0, 0))
            Line((0, 0), (FILLET4_R, 0))
        make_face()
    fillet4_piece_16 = extrude(amount=40, mode=Mode.PRIVATE)
    fillet4_piece_16 = split(fillet4_piece_16, bisect_by=Plane(origin=(-30.102401199, 18, -16.375), z_dir=(0, -1, 0)), keep=Keep.TOP, mode=Mode.PRIVATE)
    fillet4_piece_16 = split(fillet4_piece_16, bisect_by=Plane(origin=(-30.102401199, 11.287835286, -12.75), z_dir=(0, 0, -1)), keep=Keep.TOP, mode=Mode.PRIVATE)
    add(fillet4_piece_16)
    with BuildSketch(Plane(origin=(-25, 8, -20), x_dir=(-1, 0, 0), z_dir=(0, 0, 1))) as fillet4_piece_17_section:
        with BuildLine():
            CenterArc((FILLET4_R, -FILLET4_R), FILLET4_R, 90, 90)
            Line((0, -FILLET4_R), (0, 0))
            Line((0, 0), (FILLET4_R, 0))
        make_face()
    fillet4_piece_17 = extrude(amount=40, mode=Mode.PRIVATE)
    fillet4_piece_17 = split(fillet4_piece_17, bisect_by=Plane(origin=(-25.480167634, 18, -16.375), z_dir=(0, 1, 0)), keep=Keep.TOP, mode=Mode.PRIVATE)
    fillet4_piece_17 = split(fillet4_piece_17, bisect_by=Plane(origin=(-25.480167634, 21.26501569, -12.75), z_dir=(0, 0, -1)), keep=Keep.TOP, mode=Mode.PRIVATE)
    add(fillet4_piece_17)
    with BuildSketch(Plane(origin=(-25, 8, -20), x_dir=(-1, 0, 0), z_dir=(0, 0, 1))) as fillet4_piece_18_section:
        with BuildLine():
            CenterArc((FILLET4_R, -FILLET4_R), FILLET4_R, 90, 90)
            Line((0, -FILLET4_R), (0, 0))
            Line((0, 0), (FILLET4_R, 0))
        make_face()
    fillet4_piece_18 = extrude(amount=40, mode=Mode.PRIVATE)
    fillet4_piece_18 = split(fillet4_piece_18, bisect_by=Plane(origin=(-30.102401199, 11.287835286, 12.75), z_dir=(0, 0, -1)), keep=Keep.TOP, mode=Mode.PRIVATE)
    fillet4_piece_18 = split(fillet4_piece_18, bisect_by=Plane(origin=(-30.102401199, 18, 0), z_dir=(0, -1, 0)), keep=Keep.TOP, mode=Mode.PRIVATE)
    fillet4_piece_18 = split(fillet4_piece_18, bisect_by=Plane(origin=(-30.102401199, 11.287835286, -12.75), z_dir=(0, 0, 1)), keep=Keep.TOP, mode=Mode.PRIVATE)
    add(fillet4_piece_18)
    with BuildSketch(Plane(origin=(-25, 8, -20), x_dir=(-1, 0, 0), z_dir=(0, 0, 1))) as fillet4_piece_19_section:
        with BuildLine():
            CenterArc((FILLET4_R, -FILLET4_R), FILLET4_R, 90, 90)
            Line((0, -FILLET4_R), (0, 0))
            Line((0, 0), (FILLET4_R, 0))
        make_face()
    fillet4_piece_19 = extrude(amount=40, mode=Mode.PRIVATE)
    fillet4_piece_19 = split(fillet4_piece_19, bisect_by=Plane(origin=(-30.102401199, 11.287835286, 12.75), z_dir=(0, 0, 1)), keep=Keep.TOP, mode=Mode.PRIVATE)
    fillet4_piece_19 = split(fillet4_piece_19, bisect_by=Plane(origin=(-30.102401199, 18, 16.375), z_dir=(0, -1, 0)), keep=Keep.TOP, mode=Mode.PRIVATE)
    add(fillet4_piece_19)
    with BuildSketch(Plane(origin=(-25, 8, -20), x_dir=(-1, 0, 0), z_dir=(0, 0, 1))) as fillet4_piece_20_section:
        with BuildLine():
            CenterArc((FILLET4_R, -FILLET4_R), FILLET4_R, 90, 90)
            Line((0, -FILLET4_R), (0, 0))
            Line((0, 0), (FILLET4_R, 0))
        make_face()
    fillet4_piece_20 = extrude(amount=40, mode=Mode.PRIVATE)
    fillet4_piece_20 = split(fillet4_piece_20, bisect_by=Plane(origin=(-25.480167634, 21.26501569, 12.75), z_dir=(0, 0, 1)), keep=Keep.TOP, mode=Mode.PRIVATE)
    fillet4_piece_20 = split(fillet4_piece_20, bisect_by=Plane(origin=(-25.480167634, 18, 16.375), z_dir=(0, 1, 0)), keep=Keep.TOP, mode=Mode.PRIVATE)
    add(fillet4_piece_20)

    # Sketch8 → Boss-Extrude4 (add)
    with BuildSketch(Plane(origin=(0, 18, 0), x_dir=(1, 0, 0), z_dir=(0, 1, 0))):
        with Locations((-23.125, 0)):
            Rectangle(SKETCH8_W, SKETCH8_H)
        with Locations((0, 23.125)):
            Rectangle(SKETCH8_W_2, SKETCH8_H_2)
        with Locations((23.125, 0)):
            Rectangle(SKETCH8_W, SKETCH8_H)
    extrude(amount=BOSS_EXTRUDE4_DEPTH)

    # Sketch9 → Boss-Extrude5 (add)
    with BuildSketch(Plane(origin=(0, 8, 0), x_dir=(1, 0, 0), z_dir=(0, 1, 0))):
        with Locations((0, -31.25)):
            Rectangle(SKETCH9_W, SKETCH9_H)
    extrude(amount=BOSS_EXTRUDE5_DEPTH)

    # Sketch10 → Cut-Extrude5 (cut)
    with BuildSketch(Plane.XY.offset(41.25)):
        with Locations((0, 12)):
            Rectangle(SKETCH10_W, SKETCH10_H)
    extrude(amount=-CUT_EXTRUDE5_DEPTH, mode=Mode.SUBTRACT)

    # Sketch11 → Cut-Extrude6 (cut)
    with BuildSketch(Plane(origin=(0, 78, 0), x_dir=(1, 0, 0), z_dir=(0, 1, 0))):
        with Locations((0, -31.25)):
            Rectangle(SKETCH11_W, SKETCH11_H)
    extrude(amount=-CUT_EXTRUDE6_DEPTH, mode=Mode.SUBTRACT)


solid = part.part
